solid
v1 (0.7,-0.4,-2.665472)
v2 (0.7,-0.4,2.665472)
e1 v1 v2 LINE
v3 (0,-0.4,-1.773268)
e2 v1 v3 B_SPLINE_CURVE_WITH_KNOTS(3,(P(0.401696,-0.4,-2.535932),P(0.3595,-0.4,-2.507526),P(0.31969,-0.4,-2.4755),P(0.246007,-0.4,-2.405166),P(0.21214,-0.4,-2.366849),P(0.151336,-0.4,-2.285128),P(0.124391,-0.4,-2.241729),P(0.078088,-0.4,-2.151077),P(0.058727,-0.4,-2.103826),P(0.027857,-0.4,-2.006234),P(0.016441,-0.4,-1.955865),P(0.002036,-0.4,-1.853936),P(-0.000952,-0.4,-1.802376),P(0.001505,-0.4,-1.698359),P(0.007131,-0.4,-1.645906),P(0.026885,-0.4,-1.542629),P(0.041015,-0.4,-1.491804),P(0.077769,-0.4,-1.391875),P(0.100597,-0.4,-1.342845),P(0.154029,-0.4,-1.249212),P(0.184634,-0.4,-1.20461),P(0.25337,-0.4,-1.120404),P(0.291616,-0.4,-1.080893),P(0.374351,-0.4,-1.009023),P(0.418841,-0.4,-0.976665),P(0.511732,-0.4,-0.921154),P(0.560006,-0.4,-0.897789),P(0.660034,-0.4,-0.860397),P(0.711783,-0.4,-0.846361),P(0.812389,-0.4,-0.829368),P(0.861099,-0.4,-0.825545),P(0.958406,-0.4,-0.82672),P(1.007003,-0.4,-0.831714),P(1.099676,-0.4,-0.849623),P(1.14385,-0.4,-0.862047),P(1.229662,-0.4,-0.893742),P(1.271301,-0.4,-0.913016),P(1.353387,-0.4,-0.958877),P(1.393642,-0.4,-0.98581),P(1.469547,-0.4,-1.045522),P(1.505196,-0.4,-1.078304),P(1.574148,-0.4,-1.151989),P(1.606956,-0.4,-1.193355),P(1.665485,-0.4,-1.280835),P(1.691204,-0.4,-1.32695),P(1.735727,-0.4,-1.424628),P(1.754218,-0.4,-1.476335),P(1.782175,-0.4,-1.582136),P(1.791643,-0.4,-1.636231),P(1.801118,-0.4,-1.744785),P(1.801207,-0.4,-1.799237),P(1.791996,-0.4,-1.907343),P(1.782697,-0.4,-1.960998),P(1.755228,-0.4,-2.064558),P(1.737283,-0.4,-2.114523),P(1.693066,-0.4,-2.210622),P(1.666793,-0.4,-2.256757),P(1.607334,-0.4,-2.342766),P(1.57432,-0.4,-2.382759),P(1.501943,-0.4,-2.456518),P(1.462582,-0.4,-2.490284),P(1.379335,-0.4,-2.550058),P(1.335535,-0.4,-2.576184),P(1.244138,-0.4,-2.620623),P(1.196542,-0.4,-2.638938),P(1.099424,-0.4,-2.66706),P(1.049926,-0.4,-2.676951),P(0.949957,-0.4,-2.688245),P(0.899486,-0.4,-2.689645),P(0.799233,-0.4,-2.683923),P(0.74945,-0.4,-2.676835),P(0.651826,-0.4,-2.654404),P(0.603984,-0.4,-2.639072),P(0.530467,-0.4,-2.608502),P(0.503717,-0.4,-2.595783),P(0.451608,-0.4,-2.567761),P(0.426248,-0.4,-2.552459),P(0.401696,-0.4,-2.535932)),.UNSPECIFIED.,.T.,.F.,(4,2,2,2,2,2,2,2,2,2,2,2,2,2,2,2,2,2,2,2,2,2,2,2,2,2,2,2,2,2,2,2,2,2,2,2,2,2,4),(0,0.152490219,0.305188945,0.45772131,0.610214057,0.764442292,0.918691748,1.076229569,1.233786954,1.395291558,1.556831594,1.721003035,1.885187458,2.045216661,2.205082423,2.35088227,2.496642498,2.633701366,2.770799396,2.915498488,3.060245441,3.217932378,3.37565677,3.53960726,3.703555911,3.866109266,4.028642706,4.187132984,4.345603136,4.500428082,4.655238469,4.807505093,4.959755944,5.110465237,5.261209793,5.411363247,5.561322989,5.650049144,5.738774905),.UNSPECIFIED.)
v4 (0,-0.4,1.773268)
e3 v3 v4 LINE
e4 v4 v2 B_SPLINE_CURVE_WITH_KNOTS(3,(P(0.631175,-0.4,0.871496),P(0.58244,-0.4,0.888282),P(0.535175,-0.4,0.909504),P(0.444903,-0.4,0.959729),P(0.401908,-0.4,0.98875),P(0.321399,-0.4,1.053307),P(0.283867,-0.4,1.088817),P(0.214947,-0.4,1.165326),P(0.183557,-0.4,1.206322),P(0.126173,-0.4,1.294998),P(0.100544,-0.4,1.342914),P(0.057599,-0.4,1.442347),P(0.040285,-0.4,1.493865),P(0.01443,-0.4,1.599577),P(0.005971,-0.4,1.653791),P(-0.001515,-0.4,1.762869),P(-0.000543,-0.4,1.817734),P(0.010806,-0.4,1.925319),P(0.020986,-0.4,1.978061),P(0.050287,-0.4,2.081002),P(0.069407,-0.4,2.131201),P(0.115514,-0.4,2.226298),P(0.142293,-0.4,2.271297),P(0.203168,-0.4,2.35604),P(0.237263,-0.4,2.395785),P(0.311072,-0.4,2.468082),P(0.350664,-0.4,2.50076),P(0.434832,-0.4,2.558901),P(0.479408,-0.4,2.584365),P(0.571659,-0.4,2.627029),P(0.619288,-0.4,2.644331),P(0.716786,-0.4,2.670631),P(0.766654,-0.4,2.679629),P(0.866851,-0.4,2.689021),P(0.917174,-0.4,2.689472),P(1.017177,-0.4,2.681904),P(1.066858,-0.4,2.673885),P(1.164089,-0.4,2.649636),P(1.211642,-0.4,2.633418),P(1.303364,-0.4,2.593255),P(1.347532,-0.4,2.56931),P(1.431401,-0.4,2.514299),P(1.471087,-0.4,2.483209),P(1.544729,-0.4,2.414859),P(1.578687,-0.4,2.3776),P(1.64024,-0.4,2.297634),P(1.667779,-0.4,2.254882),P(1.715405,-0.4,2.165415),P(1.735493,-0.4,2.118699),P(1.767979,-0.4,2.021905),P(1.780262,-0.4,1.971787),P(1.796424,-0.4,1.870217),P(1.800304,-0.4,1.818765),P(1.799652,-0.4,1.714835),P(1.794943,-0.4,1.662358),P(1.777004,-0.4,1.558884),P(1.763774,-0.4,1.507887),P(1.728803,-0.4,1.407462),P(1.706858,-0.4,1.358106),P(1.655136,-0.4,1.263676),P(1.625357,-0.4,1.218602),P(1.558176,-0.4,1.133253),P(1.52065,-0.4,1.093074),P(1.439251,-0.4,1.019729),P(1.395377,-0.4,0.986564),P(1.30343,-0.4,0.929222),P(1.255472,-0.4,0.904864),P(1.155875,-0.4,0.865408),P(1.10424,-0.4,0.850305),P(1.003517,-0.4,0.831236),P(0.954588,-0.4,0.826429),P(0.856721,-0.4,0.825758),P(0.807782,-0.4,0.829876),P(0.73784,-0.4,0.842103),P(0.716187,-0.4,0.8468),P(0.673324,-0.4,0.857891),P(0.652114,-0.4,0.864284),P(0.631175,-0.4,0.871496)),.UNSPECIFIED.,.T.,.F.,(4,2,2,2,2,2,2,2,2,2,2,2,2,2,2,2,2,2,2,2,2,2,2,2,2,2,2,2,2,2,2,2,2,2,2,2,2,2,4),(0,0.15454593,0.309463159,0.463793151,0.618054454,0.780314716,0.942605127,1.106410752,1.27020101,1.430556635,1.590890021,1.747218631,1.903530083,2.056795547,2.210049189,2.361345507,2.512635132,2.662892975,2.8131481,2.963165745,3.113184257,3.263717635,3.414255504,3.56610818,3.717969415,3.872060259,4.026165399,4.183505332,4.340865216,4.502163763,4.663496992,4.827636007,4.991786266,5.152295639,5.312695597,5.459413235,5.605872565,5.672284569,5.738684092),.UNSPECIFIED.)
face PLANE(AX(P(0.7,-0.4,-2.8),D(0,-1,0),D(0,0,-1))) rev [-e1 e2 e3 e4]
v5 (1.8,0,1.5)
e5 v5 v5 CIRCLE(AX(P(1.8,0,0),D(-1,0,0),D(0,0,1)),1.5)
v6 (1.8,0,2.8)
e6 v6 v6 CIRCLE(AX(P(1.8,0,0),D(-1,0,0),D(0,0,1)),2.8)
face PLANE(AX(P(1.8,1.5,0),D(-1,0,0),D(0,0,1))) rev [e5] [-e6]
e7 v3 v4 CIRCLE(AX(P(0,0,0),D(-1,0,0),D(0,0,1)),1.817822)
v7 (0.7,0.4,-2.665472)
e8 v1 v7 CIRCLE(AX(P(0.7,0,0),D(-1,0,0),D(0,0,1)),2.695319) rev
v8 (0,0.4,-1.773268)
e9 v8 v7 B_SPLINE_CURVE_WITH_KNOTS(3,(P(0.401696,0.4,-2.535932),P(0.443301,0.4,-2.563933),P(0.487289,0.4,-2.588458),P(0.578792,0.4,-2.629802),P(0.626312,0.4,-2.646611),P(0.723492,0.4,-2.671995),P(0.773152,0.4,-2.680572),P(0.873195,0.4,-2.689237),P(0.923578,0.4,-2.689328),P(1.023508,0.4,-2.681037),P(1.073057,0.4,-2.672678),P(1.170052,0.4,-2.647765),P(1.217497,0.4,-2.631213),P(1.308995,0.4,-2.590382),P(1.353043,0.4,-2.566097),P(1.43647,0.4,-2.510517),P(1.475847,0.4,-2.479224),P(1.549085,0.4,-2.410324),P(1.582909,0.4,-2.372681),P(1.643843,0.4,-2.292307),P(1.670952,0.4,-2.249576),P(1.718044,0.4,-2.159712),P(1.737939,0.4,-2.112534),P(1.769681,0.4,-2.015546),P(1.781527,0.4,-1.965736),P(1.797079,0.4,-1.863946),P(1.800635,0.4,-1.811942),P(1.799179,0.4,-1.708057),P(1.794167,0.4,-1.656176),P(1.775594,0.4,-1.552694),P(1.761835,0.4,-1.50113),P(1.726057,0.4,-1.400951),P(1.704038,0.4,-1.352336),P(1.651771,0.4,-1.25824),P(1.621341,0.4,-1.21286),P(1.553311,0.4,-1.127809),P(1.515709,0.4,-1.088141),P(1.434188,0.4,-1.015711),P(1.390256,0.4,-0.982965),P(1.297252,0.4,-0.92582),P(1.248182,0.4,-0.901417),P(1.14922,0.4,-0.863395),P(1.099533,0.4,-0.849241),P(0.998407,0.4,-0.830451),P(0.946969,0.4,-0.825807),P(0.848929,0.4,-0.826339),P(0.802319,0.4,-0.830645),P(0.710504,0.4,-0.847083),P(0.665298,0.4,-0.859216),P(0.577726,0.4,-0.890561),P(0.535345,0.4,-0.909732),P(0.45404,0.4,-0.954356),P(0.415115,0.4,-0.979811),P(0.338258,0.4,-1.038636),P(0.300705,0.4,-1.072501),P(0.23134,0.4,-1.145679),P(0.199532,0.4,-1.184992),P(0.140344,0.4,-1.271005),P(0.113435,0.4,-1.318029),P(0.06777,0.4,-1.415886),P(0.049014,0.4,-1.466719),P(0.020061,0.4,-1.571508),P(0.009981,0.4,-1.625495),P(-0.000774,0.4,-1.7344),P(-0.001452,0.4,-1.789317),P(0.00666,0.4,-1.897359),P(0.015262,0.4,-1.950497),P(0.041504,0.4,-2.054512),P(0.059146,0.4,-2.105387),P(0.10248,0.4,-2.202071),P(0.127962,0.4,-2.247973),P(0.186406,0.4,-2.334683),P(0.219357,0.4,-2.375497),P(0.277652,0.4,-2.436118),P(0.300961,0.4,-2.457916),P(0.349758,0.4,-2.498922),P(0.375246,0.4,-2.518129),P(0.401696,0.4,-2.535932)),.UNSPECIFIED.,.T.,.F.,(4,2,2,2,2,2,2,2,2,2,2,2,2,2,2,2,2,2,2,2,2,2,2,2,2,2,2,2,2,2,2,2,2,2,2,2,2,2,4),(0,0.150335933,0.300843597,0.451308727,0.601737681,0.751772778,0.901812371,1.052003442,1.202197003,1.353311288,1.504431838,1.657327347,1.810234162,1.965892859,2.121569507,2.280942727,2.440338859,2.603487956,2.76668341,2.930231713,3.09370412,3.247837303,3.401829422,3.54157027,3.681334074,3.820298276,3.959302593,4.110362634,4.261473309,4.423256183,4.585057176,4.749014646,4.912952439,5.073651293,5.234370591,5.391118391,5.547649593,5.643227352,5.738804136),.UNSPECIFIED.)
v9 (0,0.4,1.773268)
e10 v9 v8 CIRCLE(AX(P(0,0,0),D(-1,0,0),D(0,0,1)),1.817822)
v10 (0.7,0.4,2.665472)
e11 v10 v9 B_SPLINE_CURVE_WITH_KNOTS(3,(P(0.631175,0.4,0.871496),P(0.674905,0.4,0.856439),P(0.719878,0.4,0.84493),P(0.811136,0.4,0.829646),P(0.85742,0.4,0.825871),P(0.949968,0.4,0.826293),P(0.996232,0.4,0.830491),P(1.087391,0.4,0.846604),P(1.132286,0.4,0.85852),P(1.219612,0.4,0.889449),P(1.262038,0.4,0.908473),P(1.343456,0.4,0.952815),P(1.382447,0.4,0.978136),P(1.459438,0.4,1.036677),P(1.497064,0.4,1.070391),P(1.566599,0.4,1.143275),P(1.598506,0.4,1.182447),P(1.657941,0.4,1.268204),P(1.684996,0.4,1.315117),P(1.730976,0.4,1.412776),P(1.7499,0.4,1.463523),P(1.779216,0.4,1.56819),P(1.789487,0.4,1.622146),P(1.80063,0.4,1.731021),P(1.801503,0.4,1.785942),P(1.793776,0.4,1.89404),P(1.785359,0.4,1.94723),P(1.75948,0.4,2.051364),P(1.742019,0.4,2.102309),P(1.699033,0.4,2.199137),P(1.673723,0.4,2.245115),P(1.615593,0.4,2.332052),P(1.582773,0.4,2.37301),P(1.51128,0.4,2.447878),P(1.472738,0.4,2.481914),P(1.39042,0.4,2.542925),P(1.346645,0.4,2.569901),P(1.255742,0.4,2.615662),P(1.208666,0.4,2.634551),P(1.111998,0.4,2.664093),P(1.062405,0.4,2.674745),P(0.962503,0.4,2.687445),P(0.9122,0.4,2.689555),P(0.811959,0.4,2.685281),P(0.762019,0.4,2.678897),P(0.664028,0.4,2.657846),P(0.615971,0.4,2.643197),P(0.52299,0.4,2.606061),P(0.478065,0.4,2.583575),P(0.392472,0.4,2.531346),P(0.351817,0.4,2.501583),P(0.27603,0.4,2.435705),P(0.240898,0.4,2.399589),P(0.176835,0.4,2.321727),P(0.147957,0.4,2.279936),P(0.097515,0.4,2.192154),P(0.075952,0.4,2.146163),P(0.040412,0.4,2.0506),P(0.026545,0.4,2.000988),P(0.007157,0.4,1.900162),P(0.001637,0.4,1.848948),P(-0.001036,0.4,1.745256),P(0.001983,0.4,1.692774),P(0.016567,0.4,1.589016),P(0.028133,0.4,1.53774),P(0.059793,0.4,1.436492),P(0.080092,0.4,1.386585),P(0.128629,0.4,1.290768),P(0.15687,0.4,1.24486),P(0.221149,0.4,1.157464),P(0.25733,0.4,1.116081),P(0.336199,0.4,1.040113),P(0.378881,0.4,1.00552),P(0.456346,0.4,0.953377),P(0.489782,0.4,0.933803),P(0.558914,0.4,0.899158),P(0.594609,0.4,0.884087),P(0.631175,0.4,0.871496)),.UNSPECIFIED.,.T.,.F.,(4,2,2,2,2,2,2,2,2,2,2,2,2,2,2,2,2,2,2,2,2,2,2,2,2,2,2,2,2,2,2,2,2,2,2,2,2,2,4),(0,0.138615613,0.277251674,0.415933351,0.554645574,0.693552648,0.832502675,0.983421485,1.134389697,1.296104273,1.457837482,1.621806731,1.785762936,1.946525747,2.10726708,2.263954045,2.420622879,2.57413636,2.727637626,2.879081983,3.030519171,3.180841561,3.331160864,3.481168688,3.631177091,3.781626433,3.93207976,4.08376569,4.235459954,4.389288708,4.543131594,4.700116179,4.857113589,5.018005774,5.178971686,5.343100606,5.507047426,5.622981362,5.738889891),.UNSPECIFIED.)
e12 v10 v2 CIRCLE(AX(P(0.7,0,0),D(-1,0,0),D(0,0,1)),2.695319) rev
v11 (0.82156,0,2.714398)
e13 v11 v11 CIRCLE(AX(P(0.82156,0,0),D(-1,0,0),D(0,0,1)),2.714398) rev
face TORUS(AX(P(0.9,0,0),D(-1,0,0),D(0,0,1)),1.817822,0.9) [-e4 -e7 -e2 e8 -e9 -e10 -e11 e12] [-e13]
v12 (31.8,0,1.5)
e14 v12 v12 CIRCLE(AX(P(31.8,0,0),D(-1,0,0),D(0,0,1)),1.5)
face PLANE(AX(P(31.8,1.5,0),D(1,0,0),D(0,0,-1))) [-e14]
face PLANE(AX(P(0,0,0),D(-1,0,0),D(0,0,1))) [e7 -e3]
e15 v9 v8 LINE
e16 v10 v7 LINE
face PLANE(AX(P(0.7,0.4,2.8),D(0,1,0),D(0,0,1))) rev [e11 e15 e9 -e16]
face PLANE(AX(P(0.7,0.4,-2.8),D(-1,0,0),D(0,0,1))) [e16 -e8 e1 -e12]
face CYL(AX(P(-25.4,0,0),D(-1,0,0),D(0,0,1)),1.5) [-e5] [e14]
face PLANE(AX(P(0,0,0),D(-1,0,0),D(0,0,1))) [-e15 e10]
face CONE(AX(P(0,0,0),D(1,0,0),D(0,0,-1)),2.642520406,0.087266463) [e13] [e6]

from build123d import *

# Parameters (mm, degrees)
SKETCH2_W  = 5.6
SKETCH2_H  = 0.8
SLOT_DEPTH = 0.7


with BuildPart() as part:
    # Fillet2: read off the stored shape, not the designer's step
    # Fillet2 outline → Fillet2 (revolve)
    with BuildSketch(Plane.YX):
        with BuildLine():
            Line((1.5, 1.8), (1.5, 31.8))
            Line((1.5, 31.8), (0, 31.8))
            Line((0, 31.8), (0, 0))
            Line((0, 0), (1.817822349, 0))
            ThreePointArc((1.817822349, 0), (2.425853536, 0.236450397), (2.714397577, 0.821559832))
            Line((2.714397577, 0.821559832), (2.8, 1.8))
            Line((2.8, 1.8), (1.5, 1.8))
        make_face()
    revolve(axis=Axis((0, 0, 0), (1, 0, 0)))

    # Sketch2 → Slot (cut)
    with BuildSketch(Plane(origin=(0, 0, 0), x_dir=(0, 0, -1), z_dir=(1, 0, 0))):
        Rectangle(SKETCH2_W, SKETCH2_H)
    extrude(amount=SLOT_DEPTH, mode=Mode.SUBTRACT)


solid = part.part
